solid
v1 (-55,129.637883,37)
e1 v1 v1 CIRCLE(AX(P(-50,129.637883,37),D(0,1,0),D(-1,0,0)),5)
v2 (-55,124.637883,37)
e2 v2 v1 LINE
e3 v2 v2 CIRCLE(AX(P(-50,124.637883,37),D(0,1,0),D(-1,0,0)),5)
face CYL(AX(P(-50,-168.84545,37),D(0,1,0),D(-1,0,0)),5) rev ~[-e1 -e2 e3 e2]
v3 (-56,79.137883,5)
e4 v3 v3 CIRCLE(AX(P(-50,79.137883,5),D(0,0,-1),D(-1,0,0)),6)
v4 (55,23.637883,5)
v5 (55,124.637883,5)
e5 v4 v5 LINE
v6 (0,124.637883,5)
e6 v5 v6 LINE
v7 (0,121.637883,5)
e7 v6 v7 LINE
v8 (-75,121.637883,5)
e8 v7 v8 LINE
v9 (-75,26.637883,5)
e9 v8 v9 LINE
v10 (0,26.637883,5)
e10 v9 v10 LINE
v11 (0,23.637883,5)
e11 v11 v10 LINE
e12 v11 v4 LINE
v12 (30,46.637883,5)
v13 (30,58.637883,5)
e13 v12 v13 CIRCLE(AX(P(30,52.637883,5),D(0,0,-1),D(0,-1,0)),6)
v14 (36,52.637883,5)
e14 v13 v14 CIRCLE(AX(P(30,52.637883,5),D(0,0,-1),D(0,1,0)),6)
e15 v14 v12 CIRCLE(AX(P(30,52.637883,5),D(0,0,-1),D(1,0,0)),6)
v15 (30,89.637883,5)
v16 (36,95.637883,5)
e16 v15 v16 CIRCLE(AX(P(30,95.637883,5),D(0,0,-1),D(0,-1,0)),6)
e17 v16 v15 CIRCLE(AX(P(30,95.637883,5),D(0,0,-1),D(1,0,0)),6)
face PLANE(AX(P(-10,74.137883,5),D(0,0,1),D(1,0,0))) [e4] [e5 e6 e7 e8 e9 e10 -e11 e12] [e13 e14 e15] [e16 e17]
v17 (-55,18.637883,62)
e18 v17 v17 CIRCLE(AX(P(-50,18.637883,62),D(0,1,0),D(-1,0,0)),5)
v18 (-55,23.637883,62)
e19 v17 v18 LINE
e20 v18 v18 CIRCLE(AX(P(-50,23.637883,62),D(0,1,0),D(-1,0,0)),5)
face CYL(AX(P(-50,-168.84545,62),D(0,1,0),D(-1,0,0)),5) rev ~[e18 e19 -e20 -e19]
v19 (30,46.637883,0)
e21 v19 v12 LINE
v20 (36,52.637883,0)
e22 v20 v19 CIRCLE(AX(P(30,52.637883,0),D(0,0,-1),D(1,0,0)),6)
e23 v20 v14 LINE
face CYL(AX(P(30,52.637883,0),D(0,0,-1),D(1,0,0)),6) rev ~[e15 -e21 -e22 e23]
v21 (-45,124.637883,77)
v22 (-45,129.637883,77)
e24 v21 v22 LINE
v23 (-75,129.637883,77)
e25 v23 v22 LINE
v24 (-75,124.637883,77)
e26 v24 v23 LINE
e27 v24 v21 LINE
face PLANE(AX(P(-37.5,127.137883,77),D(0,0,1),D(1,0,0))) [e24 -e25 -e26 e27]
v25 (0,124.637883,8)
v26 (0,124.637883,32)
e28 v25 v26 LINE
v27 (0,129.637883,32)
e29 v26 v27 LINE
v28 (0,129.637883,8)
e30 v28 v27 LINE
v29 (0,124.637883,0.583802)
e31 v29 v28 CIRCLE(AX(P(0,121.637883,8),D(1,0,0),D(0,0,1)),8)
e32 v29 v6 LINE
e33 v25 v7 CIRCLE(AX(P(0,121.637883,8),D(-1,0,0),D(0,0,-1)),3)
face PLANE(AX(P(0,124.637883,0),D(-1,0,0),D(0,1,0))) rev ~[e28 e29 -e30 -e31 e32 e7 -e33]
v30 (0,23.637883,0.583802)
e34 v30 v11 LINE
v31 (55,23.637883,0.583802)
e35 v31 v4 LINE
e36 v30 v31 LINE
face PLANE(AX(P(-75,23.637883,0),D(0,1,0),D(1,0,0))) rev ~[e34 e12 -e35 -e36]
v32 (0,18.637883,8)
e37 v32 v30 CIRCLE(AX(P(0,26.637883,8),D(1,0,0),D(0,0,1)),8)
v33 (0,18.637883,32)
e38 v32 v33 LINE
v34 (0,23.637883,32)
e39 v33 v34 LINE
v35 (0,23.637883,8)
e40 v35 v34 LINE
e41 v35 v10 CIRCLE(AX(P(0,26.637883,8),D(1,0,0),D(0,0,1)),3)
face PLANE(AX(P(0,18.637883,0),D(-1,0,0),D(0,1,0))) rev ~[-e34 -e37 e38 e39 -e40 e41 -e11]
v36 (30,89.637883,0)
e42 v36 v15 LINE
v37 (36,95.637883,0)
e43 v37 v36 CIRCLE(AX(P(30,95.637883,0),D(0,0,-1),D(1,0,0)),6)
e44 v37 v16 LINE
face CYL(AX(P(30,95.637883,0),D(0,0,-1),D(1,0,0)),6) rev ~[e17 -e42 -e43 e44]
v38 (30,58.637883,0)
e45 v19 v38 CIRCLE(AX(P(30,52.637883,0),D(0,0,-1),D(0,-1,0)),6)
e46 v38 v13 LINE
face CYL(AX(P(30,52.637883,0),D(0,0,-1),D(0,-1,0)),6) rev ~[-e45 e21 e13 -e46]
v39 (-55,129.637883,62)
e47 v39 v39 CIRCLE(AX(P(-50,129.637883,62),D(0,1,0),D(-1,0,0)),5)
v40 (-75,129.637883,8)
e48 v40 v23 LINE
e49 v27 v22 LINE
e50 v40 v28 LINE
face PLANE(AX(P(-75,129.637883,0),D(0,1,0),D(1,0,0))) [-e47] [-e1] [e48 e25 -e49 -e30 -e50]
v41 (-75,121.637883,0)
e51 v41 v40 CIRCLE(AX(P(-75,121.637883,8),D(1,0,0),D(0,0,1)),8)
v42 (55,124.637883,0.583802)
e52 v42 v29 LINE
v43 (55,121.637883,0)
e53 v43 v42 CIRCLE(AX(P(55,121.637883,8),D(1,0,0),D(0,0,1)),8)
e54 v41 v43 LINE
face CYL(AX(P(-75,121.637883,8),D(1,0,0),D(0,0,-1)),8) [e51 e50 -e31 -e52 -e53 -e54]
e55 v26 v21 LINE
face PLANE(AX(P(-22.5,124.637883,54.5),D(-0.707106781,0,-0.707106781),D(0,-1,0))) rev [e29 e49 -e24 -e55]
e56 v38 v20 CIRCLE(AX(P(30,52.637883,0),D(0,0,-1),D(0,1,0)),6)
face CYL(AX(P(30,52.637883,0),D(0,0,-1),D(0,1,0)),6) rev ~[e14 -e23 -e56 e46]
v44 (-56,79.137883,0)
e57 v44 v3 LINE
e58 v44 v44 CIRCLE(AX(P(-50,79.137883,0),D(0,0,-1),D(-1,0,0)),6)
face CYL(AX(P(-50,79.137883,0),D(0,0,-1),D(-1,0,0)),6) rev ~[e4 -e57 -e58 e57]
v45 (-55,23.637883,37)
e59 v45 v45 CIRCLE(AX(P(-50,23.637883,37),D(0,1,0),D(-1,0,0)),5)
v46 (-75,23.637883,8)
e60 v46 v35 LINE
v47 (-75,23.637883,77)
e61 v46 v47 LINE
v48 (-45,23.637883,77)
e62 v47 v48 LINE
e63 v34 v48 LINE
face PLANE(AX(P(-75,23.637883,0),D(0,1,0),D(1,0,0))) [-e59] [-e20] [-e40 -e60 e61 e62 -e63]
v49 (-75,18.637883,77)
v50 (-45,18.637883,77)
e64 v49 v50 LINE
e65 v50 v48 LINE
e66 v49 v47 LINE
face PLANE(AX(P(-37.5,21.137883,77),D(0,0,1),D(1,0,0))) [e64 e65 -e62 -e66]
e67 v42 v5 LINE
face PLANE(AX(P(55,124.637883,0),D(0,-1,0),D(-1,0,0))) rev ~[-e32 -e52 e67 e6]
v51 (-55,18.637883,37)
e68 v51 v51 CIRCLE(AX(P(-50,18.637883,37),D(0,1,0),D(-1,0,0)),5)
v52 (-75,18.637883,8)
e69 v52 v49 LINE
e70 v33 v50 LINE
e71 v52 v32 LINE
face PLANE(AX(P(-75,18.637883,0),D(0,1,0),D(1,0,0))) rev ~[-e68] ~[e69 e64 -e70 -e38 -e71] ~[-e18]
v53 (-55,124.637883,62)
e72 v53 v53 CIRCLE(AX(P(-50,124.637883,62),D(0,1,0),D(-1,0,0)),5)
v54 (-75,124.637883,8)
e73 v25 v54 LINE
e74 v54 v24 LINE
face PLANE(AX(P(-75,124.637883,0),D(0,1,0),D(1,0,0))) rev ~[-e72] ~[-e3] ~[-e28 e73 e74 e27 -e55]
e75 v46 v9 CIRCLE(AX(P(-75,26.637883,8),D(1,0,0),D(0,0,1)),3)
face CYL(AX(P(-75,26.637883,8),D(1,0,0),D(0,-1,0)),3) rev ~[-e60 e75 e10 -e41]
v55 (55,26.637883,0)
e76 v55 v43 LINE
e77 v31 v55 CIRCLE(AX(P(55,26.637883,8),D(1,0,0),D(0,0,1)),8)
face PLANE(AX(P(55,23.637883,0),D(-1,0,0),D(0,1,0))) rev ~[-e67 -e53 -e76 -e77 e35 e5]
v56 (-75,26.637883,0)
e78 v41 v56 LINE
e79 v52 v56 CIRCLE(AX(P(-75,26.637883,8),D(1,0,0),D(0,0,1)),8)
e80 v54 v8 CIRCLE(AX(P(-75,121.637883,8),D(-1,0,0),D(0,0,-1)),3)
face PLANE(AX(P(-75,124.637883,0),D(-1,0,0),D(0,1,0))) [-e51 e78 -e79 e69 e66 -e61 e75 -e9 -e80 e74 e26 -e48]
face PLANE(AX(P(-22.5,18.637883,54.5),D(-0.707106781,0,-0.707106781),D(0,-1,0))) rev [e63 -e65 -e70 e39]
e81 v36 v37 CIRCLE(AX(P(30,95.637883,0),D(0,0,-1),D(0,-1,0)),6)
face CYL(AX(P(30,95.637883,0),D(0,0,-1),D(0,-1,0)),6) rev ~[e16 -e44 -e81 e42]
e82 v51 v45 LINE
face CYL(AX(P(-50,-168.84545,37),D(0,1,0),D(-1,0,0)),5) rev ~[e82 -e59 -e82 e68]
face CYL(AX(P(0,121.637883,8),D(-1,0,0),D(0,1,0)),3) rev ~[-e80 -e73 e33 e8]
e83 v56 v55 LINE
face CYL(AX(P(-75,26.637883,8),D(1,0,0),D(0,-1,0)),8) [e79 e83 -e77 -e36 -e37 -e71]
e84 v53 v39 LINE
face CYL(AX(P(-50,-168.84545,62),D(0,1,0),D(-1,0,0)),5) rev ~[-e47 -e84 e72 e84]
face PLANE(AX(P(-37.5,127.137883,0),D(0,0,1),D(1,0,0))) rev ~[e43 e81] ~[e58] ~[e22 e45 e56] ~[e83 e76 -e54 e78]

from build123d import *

# Parameters (mm, degrees)
F1_DEPTH = 5
F0_W     = 75
F0_H     = 5
F2_DEPTH = 77
F3_SIZE  = 45
F4_SIZE  = 45
F5_R     = 3
F6_R     = 8
F8_D     = 10
F9_D     = 10


with BuildPart() as f1:
    # F0 (on Top) → F1 (new body)
    with BuildSketch(Plane.XY):
        Polygon((30, 23.6378825456), (55, 23.6378825456), (55, 124.6378825456), (0, 124.6378825456), (-75, 124.6378825456), (-75, 79.1378825456), (-75, 23.6378825456), (0, 23.6378825456), align=None)
        with BuildLine():
            ThreePointArc((36, 52.6378825456), (34.2426406871, 48.3952418585), (30, 46.6378825456))
            ThreePointArc((30, 46.6378825456), (24, 52.6378825456), (30, 58.6378825456))
            ThreePointArc((30, 58.6378825456), (34.2426406871, 56.8805232327), (36, 52.6378825456))
        make_face(mode=Mode.SUBTRACT)
        with BuildLine():
            ThreePointArc((-44, 79.1378825456), (-50, 73.1378825456), (-56, 79.1378825456))
            ThreePointArc((-56, 79.1378825456), (-50, 85.1378825456), (-44, 79.1378825456))
        make_face(mode=Mode.SUBTRACT)
        with BuildLine():
            ThreePointArc((36, 95.6378825456), (34.2426406871, 91.3952418585), (30, 89.6378825456))
            ThreePointArc((30, 89.6378825456), (25.7573593129, 99.8805232327), (36, 95.6378825456))
        make_face(mode=Mode.SUBTRACT)
    extrude(amount=F1_DEPTH)

    # F0 (on Top) → F2 (join)
    with BuildSketch(Plane.XY):
        with Locations((-37.5, 127.1378825456)):
            Rectangle(F0_W, F0_H)
        with Locations((-37.5, 21.1378825456)):
            Rectangle(F0_W, F0_H)
    extrude(amount=F2_DEPTH)

    # F3
    f3_edges = [f1.edges().sort_by_distance(p)[0] for p in [
        (0, 127.137883, 77),
    ]]
    chamfer(f3_edges, length=F3_SIZE)

    # F4
    f4_edges = [f1.edges().sort_by_distance(p)[0] for p in [
        (0, 21.137883, 77),
    ]]
    chamfer(f4_edges, length=F4_SIZE)

    # F5
    f5_edges = [f1.edges().sort_by_distance(p)[0] for p in [
        (-37.5, 124.637883, 5),
        (-37.5, 23.637883, 5),
    ]]
    fillet(f5_edges, radius=F5_R)

    # F6
    f6_edges = [f1.edges().sort_by_distance(p)[0] for p in [
        (-37.5, 18.637883, 0),
        (-37.5, 129.637883, 0),
    ]]
    fillet(f6_edges, radius=F6_R)

    # F8 (through all)
    with Locations(Plane.XZ.offset(-18.6378825456)):
        with Locations((-50, 37)):
            Hole(F8_D / 2)

    # F9 (through all)
    with Locations(Plane.XZ.offset(-18.6378825456)):
        with Locations((-50, 62)):
            Hole(F9_D / 2)


solid = f1.part
